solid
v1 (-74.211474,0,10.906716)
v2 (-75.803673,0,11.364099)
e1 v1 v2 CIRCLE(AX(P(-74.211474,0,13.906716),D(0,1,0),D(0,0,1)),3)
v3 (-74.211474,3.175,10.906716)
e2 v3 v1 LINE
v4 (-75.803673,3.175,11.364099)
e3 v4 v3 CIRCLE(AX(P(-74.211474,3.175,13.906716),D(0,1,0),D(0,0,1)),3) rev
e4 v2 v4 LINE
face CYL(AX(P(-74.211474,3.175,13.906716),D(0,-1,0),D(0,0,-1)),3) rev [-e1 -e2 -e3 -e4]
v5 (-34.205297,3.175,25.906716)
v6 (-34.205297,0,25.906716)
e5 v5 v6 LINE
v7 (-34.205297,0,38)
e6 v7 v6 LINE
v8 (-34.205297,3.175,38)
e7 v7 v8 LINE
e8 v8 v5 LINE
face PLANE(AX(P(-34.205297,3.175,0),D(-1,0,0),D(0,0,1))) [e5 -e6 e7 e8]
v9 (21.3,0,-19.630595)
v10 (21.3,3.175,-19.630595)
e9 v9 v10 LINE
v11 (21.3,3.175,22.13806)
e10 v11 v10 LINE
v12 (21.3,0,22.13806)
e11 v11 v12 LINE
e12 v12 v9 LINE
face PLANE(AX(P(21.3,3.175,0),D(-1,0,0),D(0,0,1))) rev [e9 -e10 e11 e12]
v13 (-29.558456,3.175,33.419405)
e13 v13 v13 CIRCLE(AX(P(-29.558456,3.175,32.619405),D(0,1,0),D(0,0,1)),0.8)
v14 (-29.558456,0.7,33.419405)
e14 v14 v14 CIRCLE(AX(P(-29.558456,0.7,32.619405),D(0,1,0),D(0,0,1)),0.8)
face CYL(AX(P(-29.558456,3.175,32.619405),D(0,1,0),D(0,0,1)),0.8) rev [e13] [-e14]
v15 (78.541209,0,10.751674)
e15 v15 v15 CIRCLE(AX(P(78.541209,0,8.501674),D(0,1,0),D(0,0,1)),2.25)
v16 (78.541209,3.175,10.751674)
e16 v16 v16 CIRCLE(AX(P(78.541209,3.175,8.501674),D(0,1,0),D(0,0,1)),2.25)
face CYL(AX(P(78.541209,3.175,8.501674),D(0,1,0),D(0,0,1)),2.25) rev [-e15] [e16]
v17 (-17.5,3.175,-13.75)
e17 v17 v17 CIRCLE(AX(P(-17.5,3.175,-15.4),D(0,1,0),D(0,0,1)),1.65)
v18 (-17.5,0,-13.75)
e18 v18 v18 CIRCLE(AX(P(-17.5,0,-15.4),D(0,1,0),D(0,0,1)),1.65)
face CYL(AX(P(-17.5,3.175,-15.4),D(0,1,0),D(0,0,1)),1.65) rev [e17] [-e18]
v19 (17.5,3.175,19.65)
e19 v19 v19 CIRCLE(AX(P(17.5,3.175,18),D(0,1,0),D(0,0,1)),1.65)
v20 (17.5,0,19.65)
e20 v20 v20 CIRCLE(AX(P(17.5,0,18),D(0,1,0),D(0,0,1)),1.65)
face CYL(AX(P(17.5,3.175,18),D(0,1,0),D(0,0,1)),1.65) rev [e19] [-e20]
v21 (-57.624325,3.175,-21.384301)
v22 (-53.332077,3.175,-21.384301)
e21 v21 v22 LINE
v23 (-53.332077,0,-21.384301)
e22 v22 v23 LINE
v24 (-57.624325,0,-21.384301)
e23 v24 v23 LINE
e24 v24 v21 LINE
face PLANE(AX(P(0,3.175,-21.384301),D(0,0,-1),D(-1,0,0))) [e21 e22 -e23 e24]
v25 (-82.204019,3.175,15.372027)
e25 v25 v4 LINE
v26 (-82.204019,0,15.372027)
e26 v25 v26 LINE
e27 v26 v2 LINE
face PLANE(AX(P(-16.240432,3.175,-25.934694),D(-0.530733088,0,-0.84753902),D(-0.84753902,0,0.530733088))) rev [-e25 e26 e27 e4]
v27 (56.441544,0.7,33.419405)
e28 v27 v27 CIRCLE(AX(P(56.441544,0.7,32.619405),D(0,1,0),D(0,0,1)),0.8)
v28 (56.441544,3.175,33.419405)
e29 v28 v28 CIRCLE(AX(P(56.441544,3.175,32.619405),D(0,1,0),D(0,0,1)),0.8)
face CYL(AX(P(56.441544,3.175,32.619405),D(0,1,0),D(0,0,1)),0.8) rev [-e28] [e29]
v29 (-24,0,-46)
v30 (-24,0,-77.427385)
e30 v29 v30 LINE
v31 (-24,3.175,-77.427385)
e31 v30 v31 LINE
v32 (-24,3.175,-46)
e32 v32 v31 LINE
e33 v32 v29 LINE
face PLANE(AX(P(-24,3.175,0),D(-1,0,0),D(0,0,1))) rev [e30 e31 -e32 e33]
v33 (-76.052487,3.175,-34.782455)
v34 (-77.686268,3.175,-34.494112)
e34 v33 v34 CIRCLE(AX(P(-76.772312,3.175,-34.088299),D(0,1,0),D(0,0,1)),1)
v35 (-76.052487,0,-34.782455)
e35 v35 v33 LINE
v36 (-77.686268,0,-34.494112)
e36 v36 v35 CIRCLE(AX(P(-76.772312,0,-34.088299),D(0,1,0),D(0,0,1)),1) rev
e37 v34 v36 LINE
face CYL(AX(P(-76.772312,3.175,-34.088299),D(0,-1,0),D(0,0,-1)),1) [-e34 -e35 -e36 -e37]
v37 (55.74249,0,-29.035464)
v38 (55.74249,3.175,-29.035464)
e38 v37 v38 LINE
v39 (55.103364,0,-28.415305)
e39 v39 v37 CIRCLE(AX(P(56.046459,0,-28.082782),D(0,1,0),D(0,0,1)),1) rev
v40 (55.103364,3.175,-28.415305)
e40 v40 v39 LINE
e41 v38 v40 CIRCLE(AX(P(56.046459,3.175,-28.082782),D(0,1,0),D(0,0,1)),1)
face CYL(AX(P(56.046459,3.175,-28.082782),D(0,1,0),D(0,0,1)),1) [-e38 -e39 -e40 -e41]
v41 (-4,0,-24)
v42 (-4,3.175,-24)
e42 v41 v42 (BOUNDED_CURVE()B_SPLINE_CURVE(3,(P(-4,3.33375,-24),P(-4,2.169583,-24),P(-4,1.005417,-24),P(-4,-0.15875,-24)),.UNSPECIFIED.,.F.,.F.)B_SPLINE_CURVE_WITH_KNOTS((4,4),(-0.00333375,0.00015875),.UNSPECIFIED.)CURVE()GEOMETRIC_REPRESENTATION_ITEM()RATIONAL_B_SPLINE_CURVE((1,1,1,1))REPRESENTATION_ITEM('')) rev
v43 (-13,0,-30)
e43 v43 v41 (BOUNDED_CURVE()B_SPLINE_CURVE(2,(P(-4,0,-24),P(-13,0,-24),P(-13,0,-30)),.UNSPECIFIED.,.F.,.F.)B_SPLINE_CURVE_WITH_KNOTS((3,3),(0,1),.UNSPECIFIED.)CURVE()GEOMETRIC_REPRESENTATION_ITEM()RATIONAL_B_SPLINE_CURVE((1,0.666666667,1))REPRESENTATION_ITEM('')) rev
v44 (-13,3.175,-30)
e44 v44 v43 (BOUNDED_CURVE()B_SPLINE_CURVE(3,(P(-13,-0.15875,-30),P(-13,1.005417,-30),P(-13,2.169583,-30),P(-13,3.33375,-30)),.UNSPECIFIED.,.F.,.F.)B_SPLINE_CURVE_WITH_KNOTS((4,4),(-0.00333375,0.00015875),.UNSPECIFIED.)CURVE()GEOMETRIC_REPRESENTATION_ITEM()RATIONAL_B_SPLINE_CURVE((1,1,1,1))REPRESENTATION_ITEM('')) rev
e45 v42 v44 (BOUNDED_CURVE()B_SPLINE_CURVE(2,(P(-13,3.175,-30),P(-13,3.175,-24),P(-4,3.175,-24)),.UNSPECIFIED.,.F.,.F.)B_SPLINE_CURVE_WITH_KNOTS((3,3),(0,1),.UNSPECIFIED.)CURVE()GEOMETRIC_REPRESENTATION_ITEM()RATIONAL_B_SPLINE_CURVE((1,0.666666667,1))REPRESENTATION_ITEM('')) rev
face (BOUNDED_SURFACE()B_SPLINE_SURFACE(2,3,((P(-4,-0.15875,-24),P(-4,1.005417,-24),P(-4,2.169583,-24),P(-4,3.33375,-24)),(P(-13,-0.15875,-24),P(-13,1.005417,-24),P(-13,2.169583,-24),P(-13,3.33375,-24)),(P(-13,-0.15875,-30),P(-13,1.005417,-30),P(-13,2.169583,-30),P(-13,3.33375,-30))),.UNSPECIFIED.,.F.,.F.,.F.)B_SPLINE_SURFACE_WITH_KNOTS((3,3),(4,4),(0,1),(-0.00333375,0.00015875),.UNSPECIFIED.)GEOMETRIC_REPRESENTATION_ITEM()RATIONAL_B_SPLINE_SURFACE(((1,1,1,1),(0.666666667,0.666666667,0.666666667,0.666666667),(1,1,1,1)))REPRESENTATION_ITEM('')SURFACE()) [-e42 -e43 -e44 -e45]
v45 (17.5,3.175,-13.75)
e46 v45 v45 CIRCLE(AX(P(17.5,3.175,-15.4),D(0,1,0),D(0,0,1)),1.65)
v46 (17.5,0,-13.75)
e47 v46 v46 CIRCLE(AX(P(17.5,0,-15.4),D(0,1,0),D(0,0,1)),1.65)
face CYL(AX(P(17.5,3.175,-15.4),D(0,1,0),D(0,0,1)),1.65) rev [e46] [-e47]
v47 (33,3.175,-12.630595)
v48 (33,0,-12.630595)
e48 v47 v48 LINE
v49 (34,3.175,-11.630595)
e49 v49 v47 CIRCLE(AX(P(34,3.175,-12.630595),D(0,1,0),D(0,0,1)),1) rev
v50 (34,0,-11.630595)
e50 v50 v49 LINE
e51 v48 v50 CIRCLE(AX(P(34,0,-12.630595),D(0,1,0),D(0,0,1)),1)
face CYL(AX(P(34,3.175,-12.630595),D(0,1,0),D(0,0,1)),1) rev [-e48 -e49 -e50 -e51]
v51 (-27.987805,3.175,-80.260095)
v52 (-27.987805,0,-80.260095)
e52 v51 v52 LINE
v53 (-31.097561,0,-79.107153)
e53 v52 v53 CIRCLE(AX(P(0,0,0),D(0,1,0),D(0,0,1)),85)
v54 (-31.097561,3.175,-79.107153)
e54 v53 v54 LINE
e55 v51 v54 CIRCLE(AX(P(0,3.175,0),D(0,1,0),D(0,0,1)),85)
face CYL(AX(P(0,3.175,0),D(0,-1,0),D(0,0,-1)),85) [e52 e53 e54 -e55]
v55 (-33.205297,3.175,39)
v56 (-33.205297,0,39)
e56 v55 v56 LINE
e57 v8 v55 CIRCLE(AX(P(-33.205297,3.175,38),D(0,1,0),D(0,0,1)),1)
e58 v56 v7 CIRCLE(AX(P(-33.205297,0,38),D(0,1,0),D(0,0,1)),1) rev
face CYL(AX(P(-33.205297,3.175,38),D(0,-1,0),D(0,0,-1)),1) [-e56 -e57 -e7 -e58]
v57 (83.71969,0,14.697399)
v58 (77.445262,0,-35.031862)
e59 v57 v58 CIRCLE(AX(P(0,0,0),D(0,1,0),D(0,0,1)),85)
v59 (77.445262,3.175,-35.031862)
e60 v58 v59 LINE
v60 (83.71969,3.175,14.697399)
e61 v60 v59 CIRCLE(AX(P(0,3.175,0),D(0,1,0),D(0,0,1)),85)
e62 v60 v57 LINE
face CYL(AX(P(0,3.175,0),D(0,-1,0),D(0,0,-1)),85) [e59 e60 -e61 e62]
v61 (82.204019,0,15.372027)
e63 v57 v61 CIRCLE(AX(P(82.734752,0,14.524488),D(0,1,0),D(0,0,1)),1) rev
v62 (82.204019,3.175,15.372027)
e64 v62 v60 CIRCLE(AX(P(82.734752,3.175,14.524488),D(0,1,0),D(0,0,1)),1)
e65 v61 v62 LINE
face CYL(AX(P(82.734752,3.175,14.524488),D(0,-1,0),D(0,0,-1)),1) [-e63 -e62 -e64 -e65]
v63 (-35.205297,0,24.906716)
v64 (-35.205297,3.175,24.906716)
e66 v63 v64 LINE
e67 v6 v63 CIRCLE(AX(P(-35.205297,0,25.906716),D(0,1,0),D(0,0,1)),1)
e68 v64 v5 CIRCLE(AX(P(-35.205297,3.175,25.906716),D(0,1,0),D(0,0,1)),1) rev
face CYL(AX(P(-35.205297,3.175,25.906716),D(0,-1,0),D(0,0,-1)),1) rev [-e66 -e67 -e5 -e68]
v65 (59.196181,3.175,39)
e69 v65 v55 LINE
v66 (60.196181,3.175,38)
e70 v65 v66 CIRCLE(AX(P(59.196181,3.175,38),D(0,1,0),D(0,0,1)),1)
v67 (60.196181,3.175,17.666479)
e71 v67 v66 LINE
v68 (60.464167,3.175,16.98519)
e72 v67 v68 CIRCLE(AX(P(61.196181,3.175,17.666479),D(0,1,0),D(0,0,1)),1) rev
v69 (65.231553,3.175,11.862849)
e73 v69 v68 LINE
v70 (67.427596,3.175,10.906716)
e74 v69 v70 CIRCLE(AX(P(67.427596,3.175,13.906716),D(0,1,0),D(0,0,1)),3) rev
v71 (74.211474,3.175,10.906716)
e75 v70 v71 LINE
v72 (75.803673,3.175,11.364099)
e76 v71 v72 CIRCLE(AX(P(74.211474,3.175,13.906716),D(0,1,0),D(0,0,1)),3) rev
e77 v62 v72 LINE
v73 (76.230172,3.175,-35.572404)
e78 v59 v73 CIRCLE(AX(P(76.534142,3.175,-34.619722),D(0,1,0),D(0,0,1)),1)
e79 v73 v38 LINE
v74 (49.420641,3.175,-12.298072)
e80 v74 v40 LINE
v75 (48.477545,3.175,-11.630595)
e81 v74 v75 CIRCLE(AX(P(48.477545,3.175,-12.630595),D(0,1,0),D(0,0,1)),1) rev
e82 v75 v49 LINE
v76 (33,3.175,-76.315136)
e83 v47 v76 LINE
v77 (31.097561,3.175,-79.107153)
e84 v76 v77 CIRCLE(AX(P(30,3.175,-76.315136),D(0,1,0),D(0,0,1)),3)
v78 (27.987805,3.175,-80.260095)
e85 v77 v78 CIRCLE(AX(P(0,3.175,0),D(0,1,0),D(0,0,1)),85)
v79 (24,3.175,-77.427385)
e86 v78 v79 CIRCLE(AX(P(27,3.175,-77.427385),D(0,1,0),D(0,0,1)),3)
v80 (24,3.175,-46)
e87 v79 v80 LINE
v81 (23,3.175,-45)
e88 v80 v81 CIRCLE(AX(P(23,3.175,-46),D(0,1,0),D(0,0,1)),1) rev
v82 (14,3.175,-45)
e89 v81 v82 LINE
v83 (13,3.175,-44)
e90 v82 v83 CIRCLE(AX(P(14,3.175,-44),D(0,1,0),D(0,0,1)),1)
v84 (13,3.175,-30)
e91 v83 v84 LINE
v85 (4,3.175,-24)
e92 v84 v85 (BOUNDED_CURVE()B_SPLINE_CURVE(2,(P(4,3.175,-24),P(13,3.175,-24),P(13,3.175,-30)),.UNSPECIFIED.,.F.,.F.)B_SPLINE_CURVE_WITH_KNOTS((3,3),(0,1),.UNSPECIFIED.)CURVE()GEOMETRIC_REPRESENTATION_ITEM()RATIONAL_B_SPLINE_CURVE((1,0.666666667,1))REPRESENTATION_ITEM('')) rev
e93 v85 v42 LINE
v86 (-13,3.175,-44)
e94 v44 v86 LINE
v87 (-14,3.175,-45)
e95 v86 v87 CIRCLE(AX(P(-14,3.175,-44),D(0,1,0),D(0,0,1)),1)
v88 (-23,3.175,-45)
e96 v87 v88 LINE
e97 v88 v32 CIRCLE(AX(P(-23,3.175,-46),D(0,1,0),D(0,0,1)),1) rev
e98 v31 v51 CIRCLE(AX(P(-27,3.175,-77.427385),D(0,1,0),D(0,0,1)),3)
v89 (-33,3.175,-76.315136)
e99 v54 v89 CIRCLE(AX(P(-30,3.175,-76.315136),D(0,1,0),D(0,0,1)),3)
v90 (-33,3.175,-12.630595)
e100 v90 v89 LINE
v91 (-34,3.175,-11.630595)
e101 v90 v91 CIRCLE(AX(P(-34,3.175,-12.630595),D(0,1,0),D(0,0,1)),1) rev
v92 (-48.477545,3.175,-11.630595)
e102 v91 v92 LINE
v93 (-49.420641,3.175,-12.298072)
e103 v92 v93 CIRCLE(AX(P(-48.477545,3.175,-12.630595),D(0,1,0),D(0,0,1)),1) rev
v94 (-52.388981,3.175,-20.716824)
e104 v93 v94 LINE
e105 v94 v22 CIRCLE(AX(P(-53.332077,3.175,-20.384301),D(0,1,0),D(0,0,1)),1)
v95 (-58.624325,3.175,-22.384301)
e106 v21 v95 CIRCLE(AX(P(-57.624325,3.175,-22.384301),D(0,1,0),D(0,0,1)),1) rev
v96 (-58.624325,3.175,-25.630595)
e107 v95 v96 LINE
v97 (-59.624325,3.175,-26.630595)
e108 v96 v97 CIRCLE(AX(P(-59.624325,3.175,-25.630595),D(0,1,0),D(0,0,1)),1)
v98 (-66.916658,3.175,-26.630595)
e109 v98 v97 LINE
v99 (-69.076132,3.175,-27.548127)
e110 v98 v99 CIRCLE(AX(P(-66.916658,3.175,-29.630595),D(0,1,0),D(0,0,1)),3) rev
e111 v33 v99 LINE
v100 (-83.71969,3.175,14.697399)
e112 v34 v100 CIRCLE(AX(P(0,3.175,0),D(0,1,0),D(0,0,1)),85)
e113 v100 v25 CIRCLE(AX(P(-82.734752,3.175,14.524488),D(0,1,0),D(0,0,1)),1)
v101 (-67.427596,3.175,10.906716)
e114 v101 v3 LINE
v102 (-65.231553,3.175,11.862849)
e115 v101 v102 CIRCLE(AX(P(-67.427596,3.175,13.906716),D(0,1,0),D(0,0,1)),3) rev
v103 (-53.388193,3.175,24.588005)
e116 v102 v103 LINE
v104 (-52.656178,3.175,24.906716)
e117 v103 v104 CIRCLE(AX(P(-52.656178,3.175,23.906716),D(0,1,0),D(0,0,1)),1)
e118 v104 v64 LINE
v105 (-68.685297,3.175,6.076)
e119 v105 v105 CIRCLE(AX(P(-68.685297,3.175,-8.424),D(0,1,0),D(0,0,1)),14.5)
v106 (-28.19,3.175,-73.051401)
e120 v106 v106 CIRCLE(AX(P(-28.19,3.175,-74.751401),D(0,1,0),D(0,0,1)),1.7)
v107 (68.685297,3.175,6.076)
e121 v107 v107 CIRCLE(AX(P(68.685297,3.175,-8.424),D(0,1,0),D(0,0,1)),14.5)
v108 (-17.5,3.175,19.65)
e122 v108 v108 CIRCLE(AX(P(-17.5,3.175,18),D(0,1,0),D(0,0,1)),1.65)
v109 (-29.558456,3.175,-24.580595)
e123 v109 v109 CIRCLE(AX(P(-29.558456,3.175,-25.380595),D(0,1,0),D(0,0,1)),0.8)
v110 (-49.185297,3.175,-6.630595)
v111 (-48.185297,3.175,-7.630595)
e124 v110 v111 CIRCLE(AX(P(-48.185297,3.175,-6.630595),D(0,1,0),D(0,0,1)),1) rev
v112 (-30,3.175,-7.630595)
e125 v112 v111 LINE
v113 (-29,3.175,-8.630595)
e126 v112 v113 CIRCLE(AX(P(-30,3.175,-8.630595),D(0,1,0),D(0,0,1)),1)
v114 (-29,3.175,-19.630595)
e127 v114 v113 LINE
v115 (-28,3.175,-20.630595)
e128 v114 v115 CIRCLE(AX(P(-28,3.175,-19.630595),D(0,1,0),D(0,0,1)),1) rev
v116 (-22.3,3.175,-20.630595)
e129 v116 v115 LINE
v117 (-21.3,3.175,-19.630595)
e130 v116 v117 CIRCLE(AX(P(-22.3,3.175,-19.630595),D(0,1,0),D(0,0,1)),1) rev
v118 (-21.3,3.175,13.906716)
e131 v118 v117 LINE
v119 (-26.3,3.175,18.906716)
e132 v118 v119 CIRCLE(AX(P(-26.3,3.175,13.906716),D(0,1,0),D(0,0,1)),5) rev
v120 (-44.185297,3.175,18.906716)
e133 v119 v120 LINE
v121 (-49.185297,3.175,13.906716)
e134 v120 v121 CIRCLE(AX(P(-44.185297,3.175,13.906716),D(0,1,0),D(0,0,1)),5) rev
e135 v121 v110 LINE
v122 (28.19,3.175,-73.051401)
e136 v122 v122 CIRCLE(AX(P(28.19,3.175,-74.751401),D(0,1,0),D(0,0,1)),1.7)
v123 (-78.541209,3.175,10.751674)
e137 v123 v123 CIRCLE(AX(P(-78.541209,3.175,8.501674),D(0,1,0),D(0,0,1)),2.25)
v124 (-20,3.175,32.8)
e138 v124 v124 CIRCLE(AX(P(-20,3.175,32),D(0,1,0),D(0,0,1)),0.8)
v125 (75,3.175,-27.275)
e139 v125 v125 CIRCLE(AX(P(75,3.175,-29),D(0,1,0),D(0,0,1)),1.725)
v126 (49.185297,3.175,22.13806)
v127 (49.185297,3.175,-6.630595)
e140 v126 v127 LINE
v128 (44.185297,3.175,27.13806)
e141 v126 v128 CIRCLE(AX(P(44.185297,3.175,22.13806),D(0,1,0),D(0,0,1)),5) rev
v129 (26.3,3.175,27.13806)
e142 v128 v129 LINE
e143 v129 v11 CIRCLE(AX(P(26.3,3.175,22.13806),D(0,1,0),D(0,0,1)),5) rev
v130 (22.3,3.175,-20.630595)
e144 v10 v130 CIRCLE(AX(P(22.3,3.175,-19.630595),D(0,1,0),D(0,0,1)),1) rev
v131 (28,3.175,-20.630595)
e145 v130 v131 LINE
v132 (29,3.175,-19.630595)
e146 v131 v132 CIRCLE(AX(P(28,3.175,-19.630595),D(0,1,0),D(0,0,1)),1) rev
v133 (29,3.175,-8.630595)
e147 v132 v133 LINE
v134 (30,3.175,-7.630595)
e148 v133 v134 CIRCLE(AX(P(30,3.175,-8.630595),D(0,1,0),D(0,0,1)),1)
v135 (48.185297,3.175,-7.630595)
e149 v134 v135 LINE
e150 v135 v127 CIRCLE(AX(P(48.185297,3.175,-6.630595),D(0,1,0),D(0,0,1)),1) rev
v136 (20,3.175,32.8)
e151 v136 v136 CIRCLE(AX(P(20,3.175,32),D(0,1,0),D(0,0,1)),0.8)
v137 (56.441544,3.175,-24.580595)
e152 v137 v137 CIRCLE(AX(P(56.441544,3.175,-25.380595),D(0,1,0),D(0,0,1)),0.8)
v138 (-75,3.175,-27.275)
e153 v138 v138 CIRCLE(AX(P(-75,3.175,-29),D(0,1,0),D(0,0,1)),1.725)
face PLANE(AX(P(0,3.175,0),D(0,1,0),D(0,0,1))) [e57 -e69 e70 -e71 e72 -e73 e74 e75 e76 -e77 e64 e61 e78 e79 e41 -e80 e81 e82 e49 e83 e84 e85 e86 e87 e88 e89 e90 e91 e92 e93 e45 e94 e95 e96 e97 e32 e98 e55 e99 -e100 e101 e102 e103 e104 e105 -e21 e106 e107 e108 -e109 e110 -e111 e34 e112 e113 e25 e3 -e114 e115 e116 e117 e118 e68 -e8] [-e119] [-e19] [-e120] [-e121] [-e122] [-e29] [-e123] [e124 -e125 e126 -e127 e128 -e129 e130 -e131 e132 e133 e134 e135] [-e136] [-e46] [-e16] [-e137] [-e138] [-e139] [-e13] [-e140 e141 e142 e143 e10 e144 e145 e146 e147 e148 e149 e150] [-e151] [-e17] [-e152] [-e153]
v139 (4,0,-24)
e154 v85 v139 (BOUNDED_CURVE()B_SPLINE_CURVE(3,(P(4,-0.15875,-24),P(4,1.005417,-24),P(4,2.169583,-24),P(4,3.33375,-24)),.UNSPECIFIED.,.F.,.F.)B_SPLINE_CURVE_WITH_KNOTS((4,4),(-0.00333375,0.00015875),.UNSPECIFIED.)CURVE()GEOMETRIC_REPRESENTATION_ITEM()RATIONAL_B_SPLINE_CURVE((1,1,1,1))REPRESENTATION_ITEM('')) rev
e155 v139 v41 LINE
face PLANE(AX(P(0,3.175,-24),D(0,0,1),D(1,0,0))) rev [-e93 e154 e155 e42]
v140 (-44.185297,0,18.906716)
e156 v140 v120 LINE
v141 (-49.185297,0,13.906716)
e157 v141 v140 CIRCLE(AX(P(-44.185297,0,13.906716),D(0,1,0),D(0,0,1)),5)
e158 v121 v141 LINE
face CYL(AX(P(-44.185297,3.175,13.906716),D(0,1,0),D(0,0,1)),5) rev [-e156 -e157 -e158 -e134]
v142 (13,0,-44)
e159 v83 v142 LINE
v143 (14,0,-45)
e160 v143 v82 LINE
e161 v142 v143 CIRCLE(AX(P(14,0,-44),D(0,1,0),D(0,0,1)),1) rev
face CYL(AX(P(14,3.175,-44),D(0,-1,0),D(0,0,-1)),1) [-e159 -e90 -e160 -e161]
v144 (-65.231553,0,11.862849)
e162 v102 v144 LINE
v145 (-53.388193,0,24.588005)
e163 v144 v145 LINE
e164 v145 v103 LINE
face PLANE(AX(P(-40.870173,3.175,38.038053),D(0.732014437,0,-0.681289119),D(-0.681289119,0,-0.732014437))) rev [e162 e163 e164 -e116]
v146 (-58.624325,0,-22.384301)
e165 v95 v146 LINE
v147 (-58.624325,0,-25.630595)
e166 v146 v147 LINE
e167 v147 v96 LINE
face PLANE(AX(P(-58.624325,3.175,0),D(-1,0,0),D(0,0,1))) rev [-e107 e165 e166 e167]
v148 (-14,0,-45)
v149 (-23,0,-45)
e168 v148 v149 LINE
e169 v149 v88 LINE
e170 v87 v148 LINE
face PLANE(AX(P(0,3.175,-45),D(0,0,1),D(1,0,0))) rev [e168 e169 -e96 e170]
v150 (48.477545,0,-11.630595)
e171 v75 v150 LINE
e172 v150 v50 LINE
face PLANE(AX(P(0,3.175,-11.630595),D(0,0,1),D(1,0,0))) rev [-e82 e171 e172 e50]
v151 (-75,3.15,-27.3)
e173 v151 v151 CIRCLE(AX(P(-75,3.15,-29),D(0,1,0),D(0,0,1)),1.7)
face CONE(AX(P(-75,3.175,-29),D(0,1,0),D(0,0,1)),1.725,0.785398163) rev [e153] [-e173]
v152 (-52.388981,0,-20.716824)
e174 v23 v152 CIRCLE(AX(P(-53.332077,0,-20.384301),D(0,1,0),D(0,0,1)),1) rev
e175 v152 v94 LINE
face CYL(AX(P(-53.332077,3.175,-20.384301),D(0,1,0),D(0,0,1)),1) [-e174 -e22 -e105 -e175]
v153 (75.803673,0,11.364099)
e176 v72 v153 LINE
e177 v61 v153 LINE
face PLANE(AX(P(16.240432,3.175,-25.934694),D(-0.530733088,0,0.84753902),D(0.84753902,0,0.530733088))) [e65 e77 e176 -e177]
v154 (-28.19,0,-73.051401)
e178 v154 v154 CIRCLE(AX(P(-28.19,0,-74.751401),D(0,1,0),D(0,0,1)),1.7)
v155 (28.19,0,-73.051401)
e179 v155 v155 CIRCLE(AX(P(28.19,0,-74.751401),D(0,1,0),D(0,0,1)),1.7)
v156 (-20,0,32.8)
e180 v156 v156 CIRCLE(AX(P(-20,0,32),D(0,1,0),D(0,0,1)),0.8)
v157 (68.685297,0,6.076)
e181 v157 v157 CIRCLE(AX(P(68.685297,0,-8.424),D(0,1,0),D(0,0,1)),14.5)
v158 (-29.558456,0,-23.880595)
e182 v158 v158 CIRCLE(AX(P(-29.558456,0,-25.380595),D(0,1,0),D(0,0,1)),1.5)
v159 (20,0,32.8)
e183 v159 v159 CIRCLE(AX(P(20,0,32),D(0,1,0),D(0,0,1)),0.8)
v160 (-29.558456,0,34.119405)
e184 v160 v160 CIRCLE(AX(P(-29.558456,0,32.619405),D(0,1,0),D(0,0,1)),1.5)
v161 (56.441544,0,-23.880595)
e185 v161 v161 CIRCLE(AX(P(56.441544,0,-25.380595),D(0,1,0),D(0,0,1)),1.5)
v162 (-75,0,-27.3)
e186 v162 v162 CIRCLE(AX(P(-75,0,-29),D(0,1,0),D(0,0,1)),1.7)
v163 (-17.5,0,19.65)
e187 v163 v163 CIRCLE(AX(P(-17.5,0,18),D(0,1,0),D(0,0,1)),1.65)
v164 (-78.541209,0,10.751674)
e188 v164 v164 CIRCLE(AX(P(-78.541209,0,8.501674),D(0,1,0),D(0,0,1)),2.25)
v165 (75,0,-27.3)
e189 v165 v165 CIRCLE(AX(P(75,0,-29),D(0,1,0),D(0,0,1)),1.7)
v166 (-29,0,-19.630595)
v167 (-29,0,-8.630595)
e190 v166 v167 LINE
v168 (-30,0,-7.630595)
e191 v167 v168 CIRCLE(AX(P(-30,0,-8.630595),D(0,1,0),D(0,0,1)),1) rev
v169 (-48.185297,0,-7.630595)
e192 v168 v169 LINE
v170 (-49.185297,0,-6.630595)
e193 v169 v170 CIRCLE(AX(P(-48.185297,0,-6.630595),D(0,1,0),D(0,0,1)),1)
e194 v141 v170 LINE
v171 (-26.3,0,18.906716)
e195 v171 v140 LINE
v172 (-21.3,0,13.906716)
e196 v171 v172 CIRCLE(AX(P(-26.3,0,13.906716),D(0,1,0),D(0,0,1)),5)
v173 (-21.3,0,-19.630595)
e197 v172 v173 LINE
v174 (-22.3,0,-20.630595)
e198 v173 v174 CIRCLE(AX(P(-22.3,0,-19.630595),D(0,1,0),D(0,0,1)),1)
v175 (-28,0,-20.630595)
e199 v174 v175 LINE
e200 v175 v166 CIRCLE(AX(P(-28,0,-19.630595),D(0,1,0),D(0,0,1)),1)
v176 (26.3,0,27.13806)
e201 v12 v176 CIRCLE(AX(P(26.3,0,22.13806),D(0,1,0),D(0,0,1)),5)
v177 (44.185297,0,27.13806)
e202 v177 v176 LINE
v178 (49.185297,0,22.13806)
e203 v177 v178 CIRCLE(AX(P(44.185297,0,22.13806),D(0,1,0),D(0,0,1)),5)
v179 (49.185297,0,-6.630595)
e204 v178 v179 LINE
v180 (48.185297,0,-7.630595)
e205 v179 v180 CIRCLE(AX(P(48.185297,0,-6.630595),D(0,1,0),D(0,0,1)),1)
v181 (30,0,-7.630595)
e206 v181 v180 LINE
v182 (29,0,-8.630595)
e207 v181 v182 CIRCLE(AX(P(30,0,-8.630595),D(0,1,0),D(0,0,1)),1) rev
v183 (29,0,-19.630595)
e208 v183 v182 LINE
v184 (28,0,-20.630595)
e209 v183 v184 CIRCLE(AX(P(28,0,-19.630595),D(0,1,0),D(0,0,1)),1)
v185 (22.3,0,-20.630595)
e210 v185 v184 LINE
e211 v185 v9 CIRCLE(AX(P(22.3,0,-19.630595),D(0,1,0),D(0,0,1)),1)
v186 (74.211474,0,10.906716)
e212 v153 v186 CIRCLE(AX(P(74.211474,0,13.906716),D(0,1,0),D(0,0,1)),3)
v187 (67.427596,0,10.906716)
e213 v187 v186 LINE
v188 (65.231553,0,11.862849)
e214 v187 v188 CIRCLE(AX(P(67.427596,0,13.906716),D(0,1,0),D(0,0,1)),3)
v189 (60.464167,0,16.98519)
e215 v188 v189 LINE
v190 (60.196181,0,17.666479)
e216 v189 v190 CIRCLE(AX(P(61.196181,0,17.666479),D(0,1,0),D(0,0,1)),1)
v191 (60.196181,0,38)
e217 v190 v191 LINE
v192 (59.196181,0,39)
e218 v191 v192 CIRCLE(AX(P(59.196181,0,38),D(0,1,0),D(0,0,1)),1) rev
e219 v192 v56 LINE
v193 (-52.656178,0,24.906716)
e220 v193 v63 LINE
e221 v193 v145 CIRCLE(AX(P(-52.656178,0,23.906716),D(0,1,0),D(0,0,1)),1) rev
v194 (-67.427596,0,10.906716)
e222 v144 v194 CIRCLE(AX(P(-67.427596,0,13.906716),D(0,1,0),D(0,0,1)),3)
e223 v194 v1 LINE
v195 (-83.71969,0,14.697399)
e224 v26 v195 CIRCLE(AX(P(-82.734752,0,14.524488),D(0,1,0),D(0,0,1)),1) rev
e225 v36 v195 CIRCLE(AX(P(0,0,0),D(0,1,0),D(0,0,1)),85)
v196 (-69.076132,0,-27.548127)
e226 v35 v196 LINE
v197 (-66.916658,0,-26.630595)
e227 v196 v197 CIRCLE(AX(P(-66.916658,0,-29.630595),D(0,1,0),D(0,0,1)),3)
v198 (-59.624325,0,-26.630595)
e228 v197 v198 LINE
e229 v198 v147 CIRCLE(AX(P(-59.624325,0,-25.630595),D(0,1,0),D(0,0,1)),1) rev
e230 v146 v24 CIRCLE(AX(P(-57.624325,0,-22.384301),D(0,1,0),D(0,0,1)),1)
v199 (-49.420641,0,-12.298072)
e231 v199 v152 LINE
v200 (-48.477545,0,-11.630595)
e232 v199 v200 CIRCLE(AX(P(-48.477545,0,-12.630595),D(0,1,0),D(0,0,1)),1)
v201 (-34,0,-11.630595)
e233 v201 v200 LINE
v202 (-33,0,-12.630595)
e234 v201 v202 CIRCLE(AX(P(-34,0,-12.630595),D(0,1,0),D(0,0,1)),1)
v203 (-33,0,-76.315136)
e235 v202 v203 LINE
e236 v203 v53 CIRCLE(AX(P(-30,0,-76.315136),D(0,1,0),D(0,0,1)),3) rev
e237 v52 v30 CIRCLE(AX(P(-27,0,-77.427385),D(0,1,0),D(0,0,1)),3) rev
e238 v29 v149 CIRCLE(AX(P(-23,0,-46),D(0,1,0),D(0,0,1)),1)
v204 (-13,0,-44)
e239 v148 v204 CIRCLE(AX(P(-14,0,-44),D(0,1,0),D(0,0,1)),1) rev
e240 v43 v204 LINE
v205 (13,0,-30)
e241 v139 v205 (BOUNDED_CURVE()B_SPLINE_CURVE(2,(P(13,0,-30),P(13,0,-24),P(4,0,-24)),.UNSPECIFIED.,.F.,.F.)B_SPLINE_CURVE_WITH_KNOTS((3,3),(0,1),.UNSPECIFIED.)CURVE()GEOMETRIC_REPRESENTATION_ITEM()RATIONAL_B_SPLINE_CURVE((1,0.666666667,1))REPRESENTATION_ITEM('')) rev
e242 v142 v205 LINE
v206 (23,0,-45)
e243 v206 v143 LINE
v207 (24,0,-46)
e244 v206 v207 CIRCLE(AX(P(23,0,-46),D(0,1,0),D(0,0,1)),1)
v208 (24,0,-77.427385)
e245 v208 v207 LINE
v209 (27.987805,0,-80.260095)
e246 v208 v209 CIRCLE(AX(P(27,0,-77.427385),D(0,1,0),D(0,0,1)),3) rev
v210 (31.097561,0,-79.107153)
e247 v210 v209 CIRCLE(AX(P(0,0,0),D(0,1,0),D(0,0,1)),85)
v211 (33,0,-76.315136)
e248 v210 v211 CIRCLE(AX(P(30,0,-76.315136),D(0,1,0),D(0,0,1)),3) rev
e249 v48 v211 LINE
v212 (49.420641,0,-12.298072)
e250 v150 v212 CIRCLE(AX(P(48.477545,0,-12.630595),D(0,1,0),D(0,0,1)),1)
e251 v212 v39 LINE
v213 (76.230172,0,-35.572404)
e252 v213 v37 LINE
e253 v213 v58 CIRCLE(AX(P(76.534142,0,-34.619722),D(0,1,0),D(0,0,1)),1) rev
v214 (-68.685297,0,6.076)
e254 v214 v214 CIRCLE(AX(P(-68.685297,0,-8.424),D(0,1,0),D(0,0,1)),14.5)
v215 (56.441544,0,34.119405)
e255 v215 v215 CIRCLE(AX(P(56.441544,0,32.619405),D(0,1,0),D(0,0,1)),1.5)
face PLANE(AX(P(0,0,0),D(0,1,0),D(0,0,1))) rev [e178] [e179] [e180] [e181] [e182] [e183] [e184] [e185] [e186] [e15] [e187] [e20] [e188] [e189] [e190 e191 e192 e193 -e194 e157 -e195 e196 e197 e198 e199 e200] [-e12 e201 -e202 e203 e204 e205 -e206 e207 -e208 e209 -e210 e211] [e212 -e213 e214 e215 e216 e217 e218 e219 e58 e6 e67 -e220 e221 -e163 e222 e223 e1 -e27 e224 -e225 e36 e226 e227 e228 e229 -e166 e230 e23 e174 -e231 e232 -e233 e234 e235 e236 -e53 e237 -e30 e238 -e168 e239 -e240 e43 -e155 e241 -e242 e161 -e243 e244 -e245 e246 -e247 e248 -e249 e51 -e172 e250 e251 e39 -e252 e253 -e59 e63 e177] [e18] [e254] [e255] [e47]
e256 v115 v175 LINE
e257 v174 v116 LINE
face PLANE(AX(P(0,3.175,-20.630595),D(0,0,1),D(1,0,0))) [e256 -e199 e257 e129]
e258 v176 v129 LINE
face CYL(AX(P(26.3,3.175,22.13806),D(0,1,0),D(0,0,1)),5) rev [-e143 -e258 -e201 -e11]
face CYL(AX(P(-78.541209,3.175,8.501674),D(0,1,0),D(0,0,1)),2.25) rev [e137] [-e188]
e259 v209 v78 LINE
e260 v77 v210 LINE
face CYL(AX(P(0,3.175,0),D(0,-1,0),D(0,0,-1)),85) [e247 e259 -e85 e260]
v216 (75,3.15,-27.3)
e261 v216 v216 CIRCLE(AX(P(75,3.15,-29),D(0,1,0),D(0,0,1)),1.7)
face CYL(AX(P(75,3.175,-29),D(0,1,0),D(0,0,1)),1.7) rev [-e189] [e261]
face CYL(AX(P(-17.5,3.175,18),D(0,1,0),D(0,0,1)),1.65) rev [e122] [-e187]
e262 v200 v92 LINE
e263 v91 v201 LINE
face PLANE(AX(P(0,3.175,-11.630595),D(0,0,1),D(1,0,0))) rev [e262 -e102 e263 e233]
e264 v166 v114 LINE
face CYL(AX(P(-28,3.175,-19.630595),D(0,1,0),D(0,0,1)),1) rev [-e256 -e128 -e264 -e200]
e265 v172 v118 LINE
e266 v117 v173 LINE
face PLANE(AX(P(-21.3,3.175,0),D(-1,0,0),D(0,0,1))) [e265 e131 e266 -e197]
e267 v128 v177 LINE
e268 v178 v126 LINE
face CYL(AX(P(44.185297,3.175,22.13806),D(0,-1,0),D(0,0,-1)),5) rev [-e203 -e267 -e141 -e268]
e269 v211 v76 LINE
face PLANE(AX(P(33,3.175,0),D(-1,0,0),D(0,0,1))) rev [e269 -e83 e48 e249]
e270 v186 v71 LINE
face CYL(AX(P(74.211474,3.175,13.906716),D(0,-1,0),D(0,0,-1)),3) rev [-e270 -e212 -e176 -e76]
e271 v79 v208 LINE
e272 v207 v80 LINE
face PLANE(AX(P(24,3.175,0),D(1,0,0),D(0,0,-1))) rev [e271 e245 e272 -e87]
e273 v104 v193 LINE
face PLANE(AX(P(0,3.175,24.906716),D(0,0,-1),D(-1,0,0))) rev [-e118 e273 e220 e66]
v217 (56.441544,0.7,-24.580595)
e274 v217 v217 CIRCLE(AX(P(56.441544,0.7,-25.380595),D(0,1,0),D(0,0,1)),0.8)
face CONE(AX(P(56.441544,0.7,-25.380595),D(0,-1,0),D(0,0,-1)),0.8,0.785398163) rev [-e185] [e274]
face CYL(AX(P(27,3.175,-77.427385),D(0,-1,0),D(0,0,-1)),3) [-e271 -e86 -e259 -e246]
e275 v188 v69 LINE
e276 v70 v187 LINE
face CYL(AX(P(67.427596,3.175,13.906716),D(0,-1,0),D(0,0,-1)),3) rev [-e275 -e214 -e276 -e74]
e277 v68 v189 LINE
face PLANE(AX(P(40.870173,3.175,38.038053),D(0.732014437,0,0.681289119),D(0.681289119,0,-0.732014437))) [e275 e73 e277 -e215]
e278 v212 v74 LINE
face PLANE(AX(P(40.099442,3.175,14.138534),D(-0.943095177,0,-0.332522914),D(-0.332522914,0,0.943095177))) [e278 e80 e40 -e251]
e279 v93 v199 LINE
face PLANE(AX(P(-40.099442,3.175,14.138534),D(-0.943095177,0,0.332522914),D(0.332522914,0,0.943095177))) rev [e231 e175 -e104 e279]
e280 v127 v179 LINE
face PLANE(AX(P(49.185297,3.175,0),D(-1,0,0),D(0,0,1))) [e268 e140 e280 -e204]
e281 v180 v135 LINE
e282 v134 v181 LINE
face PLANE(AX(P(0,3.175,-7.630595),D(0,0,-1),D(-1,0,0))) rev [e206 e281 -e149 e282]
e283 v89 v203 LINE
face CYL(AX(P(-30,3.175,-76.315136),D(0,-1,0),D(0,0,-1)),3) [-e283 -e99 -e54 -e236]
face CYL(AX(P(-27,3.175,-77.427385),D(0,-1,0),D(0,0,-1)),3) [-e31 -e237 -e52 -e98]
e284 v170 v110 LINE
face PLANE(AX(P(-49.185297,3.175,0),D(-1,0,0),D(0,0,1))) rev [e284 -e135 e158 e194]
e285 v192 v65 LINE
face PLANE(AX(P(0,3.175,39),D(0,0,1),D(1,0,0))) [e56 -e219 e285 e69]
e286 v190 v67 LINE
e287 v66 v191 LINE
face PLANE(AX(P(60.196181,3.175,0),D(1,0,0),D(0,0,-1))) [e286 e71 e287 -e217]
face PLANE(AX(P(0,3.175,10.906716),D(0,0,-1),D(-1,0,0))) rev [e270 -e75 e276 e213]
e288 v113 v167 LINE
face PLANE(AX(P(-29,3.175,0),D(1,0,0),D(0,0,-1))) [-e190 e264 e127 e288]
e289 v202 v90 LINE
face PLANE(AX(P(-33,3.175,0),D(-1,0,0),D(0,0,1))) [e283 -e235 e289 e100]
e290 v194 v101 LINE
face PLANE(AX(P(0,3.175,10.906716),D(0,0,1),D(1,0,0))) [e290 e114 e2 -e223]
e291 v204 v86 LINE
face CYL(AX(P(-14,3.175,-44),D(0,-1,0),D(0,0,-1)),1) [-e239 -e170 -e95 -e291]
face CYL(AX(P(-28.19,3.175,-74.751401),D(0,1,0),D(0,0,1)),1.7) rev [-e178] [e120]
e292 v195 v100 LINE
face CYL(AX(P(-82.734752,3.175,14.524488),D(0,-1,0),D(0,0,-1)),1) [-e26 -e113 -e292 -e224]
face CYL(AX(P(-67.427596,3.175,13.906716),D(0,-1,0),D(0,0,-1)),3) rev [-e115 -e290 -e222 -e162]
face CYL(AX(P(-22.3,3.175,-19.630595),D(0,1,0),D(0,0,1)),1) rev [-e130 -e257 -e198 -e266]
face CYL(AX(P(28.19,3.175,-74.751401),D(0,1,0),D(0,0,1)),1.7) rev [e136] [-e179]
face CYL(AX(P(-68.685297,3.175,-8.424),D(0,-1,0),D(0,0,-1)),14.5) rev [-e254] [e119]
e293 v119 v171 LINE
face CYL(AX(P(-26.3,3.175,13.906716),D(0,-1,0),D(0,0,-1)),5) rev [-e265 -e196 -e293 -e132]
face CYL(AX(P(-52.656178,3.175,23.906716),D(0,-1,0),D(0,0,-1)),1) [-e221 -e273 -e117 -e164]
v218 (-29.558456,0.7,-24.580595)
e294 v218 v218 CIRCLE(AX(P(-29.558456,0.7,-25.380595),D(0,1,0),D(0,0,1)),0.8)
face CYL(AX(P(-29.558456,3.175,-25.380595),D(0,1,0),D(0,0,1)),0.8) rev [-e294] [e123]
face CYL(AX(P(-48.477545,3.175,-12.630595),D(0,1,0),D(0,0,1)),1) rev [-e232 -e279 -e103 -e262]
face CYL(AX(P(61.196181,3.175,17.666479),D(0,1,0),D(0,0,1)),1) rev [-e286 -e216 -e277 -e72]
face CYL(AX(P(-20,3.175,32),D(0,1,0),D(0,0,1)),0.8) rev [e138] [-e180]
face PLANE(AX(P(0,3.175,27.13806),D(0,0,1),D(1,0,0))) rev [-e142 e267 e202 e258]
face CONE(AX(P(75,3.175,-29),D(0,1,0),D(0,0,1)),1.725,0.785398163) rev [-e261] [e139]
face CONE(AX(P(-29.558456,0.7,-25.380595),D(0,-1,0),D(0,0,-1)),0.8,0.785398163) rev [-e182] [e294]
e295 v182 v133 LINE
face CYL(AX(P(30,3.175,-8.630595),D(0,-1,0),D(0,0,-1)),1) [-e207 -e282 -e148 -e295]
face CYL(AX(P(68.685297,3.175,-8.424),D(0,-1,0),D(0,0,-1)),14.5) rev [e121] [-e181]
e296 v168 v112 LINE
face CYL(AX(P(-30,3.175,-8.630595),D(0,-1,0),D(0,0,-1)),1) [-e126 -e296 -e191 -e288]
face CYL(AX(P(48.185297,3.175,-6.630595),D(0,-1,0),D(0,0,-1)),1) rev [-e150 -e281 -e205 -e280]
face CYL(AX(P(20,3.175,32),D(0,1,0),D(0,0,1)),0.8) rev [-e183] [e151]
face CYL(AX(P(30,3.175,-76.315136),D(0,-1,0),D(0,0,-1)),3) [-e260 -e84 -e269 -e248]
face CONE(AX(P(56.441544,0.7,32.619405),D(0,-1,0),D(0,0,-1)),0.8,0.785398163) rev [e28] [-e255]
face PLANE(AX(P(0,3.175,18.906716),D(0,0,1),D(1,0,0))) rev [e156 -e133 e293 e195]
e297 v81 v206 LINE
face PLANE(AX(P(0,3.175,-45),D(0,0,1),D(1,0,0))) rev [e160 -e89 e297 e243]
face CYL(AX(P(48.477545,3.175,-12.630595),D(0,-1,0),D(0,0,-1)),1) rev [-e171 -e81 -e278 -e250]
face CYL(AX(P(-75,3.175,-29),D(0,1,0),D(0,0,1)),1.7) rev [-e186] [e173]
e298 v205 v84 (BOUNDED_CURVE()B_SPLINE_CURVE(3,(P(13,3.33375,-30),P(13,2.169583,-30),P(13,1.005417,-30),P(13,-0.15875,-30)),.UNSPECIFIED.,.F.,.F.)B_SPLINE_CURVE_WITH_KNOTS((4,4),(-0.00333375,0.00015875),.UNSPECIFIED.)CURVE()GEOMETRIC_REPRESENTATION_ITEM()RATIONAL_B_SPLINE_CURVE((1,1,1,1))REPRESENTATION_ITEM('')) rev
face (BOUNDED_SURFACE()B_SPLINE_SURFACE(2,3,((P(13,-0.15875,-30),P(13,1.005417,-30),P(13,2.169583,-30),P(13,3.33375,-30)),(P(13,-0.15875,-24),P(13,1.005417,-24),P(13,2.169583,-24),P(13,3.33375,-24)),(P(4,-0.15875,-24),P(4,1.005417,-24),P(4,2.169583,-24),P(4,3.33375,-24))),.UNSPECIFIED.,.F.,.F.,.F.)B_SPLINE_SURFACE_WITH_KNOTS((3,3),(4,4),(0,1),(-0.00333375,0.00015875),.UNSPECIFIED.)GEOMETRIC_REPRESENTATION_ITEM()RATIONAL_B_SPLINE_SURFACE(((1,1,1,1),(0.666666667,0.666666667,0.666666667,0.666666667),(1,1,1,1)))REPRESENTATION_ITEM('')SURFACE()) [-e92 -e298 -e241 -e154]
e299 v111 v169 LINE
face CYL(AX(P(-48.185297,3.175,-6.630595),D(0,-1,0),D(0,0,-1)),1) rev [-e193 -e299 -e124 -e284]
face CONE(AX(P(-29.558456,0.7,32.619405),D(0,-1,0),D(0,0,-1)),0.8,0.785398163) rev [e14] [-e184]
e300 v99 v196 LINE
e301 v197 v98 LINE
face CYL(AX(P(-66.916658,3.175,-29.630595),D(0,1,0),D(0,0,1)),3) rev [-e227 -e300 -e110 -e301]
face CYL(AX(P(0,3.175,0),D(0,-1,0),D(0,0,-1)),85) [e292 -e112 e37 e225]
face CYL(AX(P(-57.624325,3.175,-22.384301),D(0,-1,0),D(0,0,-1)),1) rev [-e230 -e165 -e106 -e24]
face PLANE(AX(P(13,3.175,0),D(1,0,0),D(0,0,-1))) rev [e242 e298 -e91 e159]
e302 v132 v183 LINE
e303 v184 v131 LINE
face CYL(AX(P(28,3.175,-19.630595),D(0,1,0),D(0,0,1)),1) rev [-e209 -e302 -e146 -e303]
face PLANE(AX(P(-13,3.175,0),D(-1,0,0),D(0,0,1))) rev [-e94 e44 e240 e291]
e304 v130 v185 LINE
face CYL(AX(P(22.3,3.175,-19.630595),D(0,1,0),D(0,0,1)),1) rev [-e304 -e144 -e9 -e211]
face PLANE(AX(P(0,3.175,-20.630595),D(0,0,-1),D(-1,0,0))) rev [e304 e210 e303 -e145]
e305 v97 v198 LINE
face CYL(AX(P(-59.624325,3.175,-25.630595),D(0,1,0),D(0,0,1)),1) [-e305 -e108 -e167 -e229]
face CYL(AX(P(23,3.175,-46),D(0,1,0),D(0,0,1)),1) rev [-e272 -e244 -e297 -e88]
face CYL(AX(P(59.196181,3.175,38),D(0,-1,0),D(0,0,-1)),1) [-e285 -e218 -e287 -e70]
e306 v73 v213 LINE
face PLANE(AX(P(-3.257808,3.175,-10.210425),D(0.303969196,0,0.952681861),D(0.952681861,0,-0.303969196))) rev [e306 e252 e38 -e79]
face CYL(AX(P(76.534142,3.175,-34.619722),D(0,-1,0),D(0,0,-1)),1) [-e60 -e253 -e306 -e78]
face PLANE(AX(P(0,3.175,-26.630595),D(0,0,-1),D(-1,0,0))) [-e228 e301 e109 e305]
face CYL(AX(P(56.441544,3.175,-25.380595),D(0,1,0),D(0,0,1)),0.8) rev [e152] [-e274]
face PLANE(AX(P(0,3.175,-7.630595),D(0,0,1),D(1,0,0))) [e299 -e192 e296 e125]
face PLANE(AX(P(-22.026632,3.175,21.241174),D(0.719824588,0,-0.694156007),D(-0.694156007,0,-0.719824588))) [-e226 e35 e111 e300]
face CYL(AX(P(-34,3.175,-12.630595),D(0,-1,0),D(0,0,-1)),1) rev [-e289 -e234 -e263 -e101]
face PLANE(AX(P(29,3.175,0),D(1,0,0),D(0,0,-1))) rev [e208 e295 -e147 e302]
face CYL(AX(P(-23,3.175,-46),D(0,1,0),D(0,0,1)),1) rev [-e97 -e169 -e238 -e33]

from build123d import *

# Parameters (mm, degrees)
BOSS_EXTRUDE1_OUTLINE_R        = 14.5
BOSS_EXTRUDE1_DEPTH            = 3.175
M4_CLEARANCE_HOLE1_D           = 4.5
F_3_3_3_3_DIAMETER_HOLE4_D     = 3.3
M3_CLEARANCE_HOLE2_D           = 3.4
M2X0_4_TAPPED_HOLE2_AT_2_COUNT = 2
M2X0_4_TAPPED_HOLE2_AT_2_PITCH = 86
M2X0_4_TAPPED_HOLE2_AT_3_COUNT = 2
M2X0_4_TAPPED_HOLE2_AT_3_PITCH = 103.730419839
M2X0_4_TAPPED_HOLE2_AT_4_COUNT = 2
M2X0_4_TAPPED_HOLE2_AT_4_PITCH = 58
FILLET1_R                      = 3
FILLET2_R                      = 1
FILLET3_SIZE                   = 6
FILLET3_SIZE_2                 = 9
FILLET4_R                      = 5
M3_CLEARANCE_HOLE1_D           = 3.4
M3_CLEARANCE_HOLE1_CSINK_D     = 3.45
M3_CLEARANCE_HOLE1_CSINK_ANGLE = 90
M2X0_4_TAPPED_HOLE1_D          = 1.6


with BuildPart() as part:
    # Boss-Extrude1: read off the stored shape, not the designer's step
    # Boss-Extrude1 outline → Boss-Extrude1 (new body)
    with BuildSketch(Plane(origin=(0, 0, 0), x_dir=(1, 0, 0), z_dir=(0, 1, 0))):
        with BuildLine():
            Line((33, 11.630595388), (33, 78.33262411))
            ThreePointArc((33, 78.33262411), (28.545123253, 80.063574355), (24, 81.541400528))
            Line((24, 81.541400528), (24, 45))
            Line((24, 45), (13, 45))
            Line((13, 45), (13, 24))
            Line((13, 24), (-13, 24))
            Line((-13, 24), (-13, 45))
            Line((-13, 45), (-24, 45))
            Line((-24, 45), (-24, 81.541400528))
            ThreePointArc((-24, 81.541400528), (-28.545123253, 80.063574355), (-33, 78.33262411))
            Line((-33, 78.33262411), (-33, 11.630595388))
            Line((-33, 11.630595388), (-49.185297029, 11.630595388))
            Line((-49.185297029, 11.630595388), (-52.624325057, 21.384301413))
            Line((-52.624325057, 21.384301413), (-58.624325057, 21.384301413))
            Line((-58.624325057, 21.384301413), (-58.624325057, 26.630595388))
            Line((-58.624325057, 26.630595388), (-68.191318528, 26.630595388))
            Line((-68.191318528, 26.630595388), (-77.073860284, 35.841596796))
            ThreePointArc((-77.073860284, 35.841596796), (-84.367778143, 10.347850562), (-83.451078309, -16.152941807))
            Line((-83.451078309, -16.152941807), (-75.073268231, -10.906716078))
            Line((-75.073268231, -10.906716078), (-66.121429656, -10.906716078))
            Line((-66.121429656, -10.906716078), (-53.091566877, -24.906716078))
            Line((-53.091566877, -24.906716078), (-34.205297029, -24.906716078))
            Line((-34.205297029, -24.906716078), (-34.205297029, -39))
            Line((-34.205297029, -39), (60.196181169, -39))
            Line((60.196181169, -39), (60.196181169, -17.27312839))
            Line((60.196181169, -17.27312839), (66.121429656, -10.906716078))
            Line((66.121429656, -10.906716078), (75.073268231, -10.906716078))
            Line((75.073268231, -10.906716078), (83.451078309, -16.152941807))
            ThreePointArc((83.451078309, -16.152941807), (84.367778143, 10.347850562), (77.073860284, 35.841596796))
            Line((77.073860284, 35.841596796), (55.268726082, 28.884301413))
            Line((55.268726082, 28.884301413), (49.185297029, 11.630595388))
            Line((49.185297029, 11.630595388), (33, 11.630595388))
        make_face()
        with Locations((-68.685297029, 8.424)):
            Circle(BOSS_EXTRUDE1_OUTLINE_R, mode=Mode.SUBTRACT)
        Polygon((-49.185297029, -18.906716078), (-49.185297029, 7.630595388), (-29, 7.630595388), (-29, 20.630595388), (-21.3, 20.630595388), (-21.3, -18.906716078), align=None, mode=Mode.SUBTRACT)
        Polygon((29, 20.630595388), (29, 7.630595388), (49.185297029, 7.630595388), (49.185297029, -27.138060345), (21.3, -27.138060345), (21.3, 20.630595388), align=None, mode=Mode.SUBTRACT)
        with Locations((68.685297029, 8.424)):
            Circle(BOSS_EXTRUDE1_OUTLINE_R, mode=Mode.SUBTRACT)
    extrude(amount=BOSS_EXTRUDE1_DEPTH)

    # M4 Clearance Hole1 (through all)
    with Locations(Plane(origin=(0, 3.175, 0), x_dir=(1, 0, 0), z_dir=(0, 1, 0))):
        with Locations((-78.54120923, -8.5016735), (78.54120923, -8.5016735)):
            Hole(M4_CLEARANCE_HOLE1_D / 2)

    # Ø3.3 (3.3) Diameter Hole4 (through all)
    with Locations(Plane(origin=(0, 3.175, 0), x_dir=(1, 0, 0), z_dir=(0, 1, 0))):
        with Locations((17.5, 15.4), (-17.5, -18), (-17.5, 15.4), (17.5, -18)):
            Hole(F_3_3_3_3_DIAMETER_HOLE4_D / 2)

    # M3 Clearance Hole2 (through all)
    with Locations(Plane(origin=(0, 3.175, 0), x_dir=(1, 0, 0), z_dir=(0, 1, 0))):
        with Locations((28.19, 74.751400528), (-28.19, 74.751400528)):
            Hole(M3_CLEARANCE_HOLE2_D / 2)

    # Sketch15 → M2x0.4 Tapped Hole2 (revolve, cut)
    with BuildSketch(Plane(origin=(-29.558455866, 3.175, -25.380595388), x_dir=(0, 0, 1), z_dir=(1, 0, 0))):
        Polygon((0, 0), (0, 3.175), (1.5, 3.175), (0.8, 2.475), (0.8, 0), align=None)
    m2x0_4_tapped_hole2 = revolve(axis=Axis((-29.558455866, 9.525, -25.380595388), (0, -1, 0)), mode=Mode.SUBTRACT)

    # M2x0.4 Tapped Hole2 at 2: M2x0.4 Tapped Hole2 ×2
    with Locations(*[(i * M2X0_4_TAPPED_HOLE2_AT_2_PITCH, 0, 0) for i in range(1, M2X0_4_TAPPED_HOLE2_AT_2_COUNT)]):
        add(m2x0_4_tapped_hole2, mode=Mode.SUBTRACT)

    # M2x0.4 Tapped Hole2 at 3: M2x0.4 Tapped Hole2 ×2
    with Locations(*[Vector(0.8290721288256765, 0, 0.5591416682777818) * (i * M2X0_4_TAPPED_HOLE2_AT_3_PITCH) for i in range(1, M2X0_4_TAPPED_HOLE2_AT_3_COUNT)]):
        add(m2x0_4_tapped_hole2, mode=Mode.SUBTRACT)

    # M2x0.4 Tapped Hole2 at 4: M2x0.4 Tapped Hole2 ×2
    with Locations(*[(0, 0, i * M2X0_4_TAPPED_HOLE2_AT_4_PITCH) for i in range(1, M2X0_4_TAPPED_HOLE2_AT_4_COUNT)]):
        add(m2x0_4_tapped_hole2, mode=Mode.SUBTRACT)

    # Fillet1
    fillet1_edges = [part.edges().sort_by_distance(p)[0] for p in [
        (75.073268231, 1.5875, 10.906716078),
        (66.121429656, 1.5875, 10.906716078),
        (-66.121429656, 1.5875, 10.906716078),
        (-75.073268231, 1.5875, 10.906716078),
        (-68.191318528, 1.5875, -26.630595388),
        (-33, 1.5875, -78.33262411),
        (-24, 1.5875, -81.541400528),
        (24, 1.5875, -81.541400528),
        (33, 1.5875, -78.33262411),
    ]]
    fillet(fillet1_edges, radius=FILLET1_R)

    # Fillet2
    fillet2_edges = [part.edges().sort_by_distance(p)[0] for p in [
        (33, 1.5875, -11.630595388),
        (49.185297029, 1.5875, -11.630595388),
        (55.268726082, 1.5875, -28.884301413),
        (77.073860284, 1.5875, -35.841596796),
        (83.451078309, 1.5875, 16.152941807),
        (60.196181169, 1.5875, 17.27312839),
        (60.196181169, 1.5875, 39),
        (-34.205297029, 1.5875, 39),
        (-34.205297029, 1.5875, 24.906716078),
        (-53.091566877, 1.5875, 24.906716078),
        (-83.451078309, 1.5875, 16.152941807),
        (-77.073860284, 1.5875, -35.841596796),
        (-58.624325057, 1.5875, -26.630595388),
        (-58.624325057, 1.5875, -21.384301413),
        (-52.624325057, 1.5875, -21.384301413),
        (-49.185297029, 1.5875, -11.630595388),
        (-33, 1.5875, -11.630595388),
        (-24, 1.5875, -45),
        (-13, 1.5875, -45),
        (13, 1.5875, -45),
        (24, 1.5875, -45),
        (-49.185297029, 1.5875, -7.630595388),
        (-21.3, 1.5875, -20.630595388),
        (-29, 1.5875, -20.630595388),
        (-29, 1.5875, -7.630595388),
        (29, 1.5875, -20.630595388),
        (21.3, 1.5875, -20.630595388),
        (49.185297029, 1.5875, -7.630595388),
        (29, 1.5875, -7.630595388),
    ]]
    fillet(fillet2_edges, radius=FILLET2_R)

    # Fillet3
    # a fillet whose section is not a circle: 9, 6 mm, written as the material it adds along each edge
    with BuildSketch(Plane(origin=(13, 0, -24), x_dir=(0, 0, -1), z_dir=(0, 1, 0))) as fillet3_piece_1:
        with BuildLine():
            Bezier((FILLET3_SIZE, 0), (0, 0), (0, FILLET3_SIZE_2), weights=[1, 0.666666667, 1])
            Line((0, FILLET3_SIZE_2), (0, 0))
            Line((0, 0), (FILLET3_SIZE, 0))
        make_face()
    extrude(amount=3.175)
    with BuildSketch(Plane(origin=(-13, 0, -24), x_dir=(1, 0, 0), z_dir=(0, 1, 0))) as fillet3_piece_2:
        with BuildLine():
            Bezier((FILLET3_SIZE_2, 0), (0, 0), (0, FILLET3_SIZE), weights=[1, 0.666666667, 1])
            Line((0, FILLET3_SIZE), (0, 0))
            Line((0, 0), (FILLET3_SIZE_2, 0))
        make_face()
    extrude(amount=3.175)

    # Fillet4
    fillet4_edges = [part.edges().sort_by_distance(p)[0] for p in [
        (-49.185297029, 1.5875, 18.906716078),
        (-21.3, 1.5875, 18.906716078),
        (21.3, 1.5875, 27.138060345),
        (49.185297029, 1.5875, 27.138060345),
    ]]
    fillet(fillet4_edges, radius=FILLET4_R)

    # M3 Clearance Hole1 (through all)
    with Locations(Plane(origin=(0, 3.175, 0), x_dir=(1, 0, 0), z_dir=(0, 1, 0))):
        with Locations((75, 29), (-75, 29)):
            CounterSinkHole(M3_CLEARANCE_HOLE1_D / 2, M3_CLEARANCE_HOLE1_CSINK_D / 2, counter_sink_angle=M3_CLEARANCE_HOLE1_CSINK_ANGLE)

    # M2x0.4 Tapped Hole1 (through all)
    with Locations(Plane(origin=(0, 3.175, 0), x_dir=(1, 0, 0), z_dir=(0, 1, 0))):
        with Locations((-20, -32), (20, -32)):
            Hole(M2X0_4_TAPPED_HOLE1_D / 2)


solid = part.part
